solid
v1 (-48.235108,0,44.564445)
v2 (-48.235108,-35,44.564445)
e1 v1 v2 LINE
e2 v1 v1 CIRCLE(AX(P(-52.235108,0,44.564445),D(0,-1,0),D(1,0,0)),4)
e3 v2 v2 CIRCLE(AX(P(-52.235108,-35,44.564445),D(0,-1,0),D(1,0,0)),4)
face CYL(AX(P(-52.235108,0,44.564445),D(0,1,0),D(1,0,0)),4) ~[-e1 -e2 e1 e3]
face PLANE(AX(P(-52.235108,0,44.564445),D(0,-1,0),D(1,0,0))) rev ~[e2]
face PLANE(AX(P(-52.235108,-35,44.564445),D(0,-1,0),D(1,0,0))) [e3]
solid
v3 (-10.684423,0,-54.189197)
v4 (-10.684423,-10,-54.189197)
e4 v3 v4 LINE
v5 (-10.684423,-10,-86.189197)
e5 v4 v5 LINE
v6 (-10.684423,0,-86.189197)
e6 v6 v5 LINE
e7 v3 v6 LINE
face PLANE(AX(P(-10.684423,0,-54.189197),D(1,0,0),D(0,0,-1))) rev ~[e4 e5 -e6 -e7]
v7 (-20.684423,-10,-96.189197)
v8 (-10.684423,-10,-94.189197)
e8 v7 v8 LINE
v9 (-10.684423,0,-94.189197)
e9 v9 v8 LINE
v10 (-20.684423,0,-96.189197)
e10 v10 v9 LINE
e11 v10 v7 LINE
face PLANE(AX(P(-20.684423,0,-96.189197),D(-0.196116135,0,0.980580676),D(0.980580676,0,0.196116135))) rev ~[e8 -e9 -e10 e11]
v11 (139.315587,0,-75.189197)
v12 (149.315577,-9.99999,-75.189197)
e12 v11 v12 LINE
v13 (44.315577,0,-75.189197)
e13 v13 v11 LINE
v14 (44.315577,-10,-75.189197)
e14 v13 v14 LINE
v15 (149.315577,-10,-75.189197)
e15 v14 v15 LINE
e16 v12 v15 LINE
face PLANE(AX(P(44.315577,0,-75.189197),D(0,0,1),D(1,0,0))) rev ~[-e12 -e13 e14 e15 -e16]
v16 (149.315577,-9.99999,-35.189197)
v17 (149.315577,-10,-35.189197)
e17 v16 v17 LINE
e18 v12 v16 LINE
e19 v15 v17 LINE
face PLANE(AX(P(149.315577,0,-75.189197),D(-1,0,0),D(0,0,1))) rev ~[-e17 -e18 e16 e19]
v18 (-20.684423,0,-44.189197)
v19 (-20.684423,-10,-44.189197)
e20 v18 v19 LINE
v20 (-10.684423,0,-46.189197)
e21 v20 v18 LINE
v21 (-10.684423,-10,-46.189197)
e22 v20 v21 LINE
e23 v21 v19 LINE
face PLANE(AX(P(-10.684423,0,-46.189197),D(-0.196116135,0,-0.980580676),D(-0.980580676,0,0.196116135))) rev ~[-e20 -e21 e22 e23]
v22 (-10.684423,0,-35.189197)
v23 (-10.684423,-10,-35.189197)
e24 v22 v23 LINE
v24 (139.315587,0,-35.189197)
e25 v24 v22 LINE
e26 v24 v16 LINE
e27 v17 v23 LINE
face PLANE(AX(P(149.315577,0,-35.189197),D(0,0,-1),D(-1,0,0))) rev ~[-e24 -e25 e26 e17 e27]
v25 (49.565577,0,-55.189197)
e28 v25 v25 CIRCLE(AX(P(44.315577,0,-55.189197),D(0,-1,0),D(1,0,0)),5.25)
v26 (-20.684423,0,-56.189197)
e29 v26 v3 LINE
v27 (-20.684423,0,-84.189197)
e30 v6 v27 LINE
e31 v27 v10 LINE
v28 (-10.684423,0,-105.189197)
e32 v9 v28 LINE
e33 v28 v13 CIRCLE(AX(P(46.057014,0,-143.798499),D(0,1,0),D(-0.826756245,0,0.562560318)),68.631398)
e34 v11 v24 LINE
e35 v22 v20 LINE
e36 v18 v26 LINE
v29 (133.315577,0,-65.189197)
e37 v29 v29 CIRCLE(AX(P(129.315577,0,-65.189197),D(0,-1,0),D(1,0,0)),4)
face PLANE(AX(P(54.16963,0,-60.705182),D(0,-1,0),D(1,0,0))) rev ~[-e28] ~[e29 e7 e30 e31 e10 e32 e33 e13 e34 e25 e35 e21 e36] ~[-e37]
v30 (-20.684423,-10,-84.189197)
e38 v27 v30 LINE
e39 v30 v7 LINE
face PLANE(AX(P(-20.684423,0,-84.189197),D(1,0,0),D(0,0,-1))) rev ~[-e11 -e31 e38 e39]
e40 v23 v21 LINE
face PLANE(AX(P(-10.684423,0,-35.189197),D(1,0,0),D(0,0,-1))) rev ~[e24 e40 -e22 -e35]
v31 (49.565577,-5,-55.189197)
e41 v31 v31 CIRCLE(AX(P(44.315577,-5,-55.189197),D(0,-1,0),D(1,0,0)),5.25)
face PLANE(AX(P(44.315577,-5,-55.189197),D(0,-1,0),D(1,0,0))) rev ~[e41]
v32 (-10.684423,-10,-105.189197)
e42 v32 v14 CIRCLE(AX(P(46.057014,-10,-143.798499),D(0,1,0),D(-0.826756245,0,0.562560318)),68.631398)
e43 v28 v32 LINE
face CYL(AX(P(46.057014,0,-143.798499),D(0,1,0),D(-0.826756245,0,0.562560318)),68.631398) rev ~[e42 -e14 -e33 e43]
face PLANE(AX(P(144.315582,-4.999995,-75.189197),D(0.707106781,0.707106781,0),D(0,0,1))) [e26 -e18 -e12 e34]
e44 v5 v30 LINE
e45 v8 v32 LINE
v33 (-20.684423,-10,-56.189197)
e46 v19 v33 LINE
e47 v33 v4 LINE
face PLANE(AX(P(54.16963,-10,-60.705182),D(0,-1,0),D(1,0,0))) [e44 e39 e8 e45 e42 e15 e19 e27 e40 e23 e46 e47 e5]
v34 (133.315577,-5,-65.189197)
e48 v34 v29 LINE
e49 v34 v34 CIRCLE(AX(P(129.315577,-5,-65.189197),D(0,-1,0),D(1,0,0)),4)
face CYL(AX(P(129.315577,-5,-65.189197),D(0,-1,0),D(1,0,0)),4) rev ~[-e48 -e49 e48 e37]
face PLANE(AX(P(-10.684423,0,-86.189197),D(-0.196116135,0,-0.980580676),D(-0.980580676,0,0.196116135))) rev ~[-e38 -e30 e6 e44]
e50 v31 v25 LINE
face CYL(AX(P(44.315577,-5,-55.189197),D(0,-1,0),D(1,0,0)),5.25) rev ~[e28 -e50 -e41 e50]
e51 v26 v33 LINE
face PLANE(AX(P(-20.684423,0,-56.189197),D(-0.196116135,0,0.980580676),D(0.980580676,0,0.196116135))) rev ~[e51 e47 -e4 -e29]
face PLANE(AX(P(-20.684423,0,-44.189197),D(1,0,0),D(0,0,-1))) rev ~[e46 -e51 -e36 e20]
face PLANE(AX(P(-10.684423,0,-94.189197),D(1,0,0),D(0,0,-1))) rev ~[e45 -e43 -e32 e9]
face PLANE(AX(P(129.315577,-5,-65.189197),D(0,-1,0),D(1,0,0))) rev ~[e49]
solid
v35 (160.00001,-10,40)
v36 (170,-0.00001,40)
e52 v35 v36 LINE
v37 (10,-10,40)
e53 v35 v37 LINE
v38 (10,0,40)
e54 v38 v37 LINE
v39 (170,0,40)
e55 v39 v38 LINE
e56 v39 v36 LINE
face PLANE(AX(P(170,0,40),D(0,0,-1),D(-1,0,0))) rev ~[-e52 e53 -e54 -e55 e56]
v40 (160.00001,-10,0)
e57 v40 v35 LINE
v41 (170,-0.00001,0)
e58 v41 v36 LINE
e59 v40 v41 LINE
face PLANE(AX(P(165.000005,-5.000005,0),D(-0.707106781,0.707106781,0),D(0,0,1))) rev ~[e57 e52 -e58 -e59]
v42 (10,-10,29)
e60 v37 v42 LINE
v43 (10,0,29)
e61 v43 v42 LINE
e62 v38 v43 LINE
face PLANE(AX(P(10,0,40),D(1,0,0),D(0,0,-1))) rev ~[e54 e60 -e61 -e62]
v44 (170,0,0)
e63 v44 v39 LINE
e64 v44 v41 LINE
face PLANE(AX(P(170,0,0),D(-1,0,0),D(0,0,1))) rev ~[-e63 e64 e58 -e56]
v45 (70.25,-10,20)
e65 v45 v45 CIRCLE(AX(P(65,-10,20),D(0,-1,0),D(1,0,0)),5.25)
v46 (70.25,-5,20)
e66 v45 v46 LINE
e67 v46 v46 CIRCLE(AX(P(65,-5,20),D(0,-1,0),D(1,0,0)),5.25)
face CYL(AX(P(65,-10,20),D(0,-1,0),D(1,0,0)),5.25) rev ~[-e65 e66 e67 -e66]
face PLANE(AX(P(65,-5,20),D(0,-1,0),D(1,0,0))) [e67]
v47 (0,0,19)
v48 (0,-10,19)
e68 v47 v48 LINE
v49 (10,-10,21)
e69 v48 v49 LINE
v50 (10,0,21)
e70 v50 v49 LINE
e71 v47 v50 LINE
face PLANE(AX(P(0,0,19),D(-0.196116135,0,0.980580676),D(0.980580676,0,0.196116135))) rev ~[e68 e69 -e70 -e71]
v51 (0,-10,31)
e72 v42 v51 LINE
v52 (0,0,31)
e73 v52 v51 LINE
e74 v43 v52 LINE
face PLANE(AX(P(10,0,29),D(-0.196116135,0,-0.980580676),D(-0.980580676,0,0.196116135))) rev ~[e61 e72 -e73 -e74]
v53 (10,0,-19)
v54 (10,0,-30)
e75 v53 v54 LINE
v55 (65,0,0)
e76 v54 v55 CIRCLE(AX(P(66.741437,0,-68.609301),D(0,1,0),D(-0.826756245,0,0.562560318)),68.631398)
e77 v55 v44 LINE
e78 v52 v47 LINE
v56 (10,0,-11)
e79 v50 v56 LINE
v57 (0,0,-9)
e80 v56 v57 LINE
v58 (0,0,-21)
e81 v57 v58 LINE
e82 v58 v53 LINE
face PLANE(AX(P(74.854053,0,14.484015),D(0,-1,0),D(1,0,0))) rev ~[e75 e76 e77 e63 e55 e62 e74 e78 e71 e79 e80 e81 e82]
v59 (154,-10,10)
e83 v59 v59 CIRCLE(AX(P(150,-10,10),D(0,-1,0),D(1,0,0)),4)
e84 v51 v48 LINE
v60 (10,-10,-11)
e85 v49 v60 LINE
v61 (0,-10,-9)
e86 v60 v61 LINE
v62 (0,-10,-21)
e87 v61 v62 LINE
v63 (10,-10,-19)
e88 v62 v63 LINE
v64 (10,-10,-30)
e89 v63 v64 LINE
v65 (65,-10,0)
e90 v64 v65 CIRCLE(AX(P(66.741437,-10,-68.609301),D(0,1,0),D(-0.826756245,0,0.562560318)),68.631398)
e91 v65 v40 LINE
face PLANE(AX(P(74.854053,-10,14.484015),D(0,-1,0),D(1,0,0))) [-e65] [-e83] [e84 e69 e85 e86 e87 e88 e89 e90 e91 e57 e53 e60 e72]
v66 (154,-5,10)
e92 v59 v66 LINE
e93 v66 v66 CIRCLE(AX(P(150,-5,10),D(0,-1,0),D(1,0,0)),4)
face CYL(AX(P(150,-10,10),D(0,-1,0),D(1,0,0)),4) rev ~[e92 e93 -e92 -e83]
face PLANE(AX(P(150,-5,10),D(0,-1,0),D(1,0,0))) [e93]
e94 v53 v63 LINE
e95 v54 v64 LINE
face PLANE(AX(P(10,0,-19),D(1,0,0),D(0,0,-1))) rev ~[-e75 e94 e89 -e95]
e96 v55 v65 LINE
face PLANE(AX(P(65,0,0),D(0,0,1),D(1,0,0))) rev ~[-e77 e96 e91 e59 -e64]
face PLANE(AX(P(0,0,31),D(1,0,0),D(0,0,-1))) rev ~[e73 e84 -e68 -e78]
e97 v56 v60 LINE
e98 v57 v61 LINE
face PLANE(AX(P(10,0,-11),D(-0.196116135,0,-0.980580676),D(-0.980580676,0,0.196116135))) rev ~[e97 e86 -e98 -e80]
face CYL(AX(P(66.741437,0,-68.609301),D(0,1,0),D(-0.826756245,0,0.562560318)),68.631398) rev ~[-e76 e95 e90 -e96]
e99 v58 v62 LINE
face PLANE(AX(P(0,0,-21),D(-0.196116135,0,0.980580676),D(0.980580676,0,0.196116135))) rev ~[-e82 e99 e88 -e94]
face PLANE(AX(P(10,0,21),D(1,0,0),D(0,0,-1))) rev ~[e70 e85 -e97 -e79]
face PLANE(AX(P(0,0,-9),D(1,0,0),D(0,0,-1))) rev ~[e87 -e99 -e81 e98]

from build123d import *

# Parameters (mm, degrees)
F1_DEPTH  = 10
F2_R      = 5.25
F2_R_2    = 4
F3_DEPTH  = 5
F4_SIZE   = 9.99999
F6_DEPTH  = 10
F8_START  = -5
F7_R      = 5.25
F7_R_2    = 4
F8_DEPTH  = 5
F9_SIZE   = 9.99999
F10_R     = 4
F11_DEPTH = 35


# Not quite as in the source:
# - a fillet or chamfer is up to 0.001 mm smaller than in the source, because OpenCascade refuses the exact size


with BuildPart() as f1:
    # F0 (on Front) → F1 (new body)
    with BuildSketch(Plane.XZ):
        with BuildLine():
            ThreePointArc((10, -30), (33.8771457744, -8.3581005863), (65, 0))
            Line((65, 0), (170, 0))
            Line((170, 0), (170, 40))
            Line((170, 40), (10, 40))
            Line((10, 40), (10, 29))
            Line((10, 29), (0, 31))
            Line((0, 31), (0, 19))
            Line((0, 19), (10, 21))
            Line((10, 21), (10, -11))
            Line((10, -11), (0, -9))
            Line((0, -9), (0, -21))
            Line((0, -21), (10, -19))
            Line((10, -19), (10, -30))
        make_face()
    extrude(amount=F1_DEPTH)

    # F2 (on face) → F3 (cut)
    with BuildSketch(Plane.XZ.offset(10)):
        with Locations((65, 20)):
            Circle(F2_R)
        with Locations((150, 10)):
            Circle(F2_R_2)
    extrude(amount=-F3_DEPTH, mode=Mode.SUBTRACT)

    # F4 (size 10 in the source; OpenCascade refuses exactly that, so slightly less here)
    f4_edges = [f1.edges().sort_by_distance(p)[0] for p in [
        (170, -10, 20),
    ]]
    chamfer(f4_edges, length=F4_SIZE)


with BuildPart() as f6:
    # F5 (on Front) → F6 (new body)
    with BuildSketch(Plane.XZ):
        with BuildLine():
            ThreePointArc((-10.6844227825, -105.189197356), (13.1927229919, -83.5472979423), (44.3155772175, -75.189197356))
            Line((44.3155772175, -75.189197356), (149.3155772175, -75.189197356))
            Line((149.3155772175, -75.189197356), (149.3155772175, -35.189197356))
            Line((149.3155772175, -35.189197356), (-10.6844227825, -35.189197356))
            Line((-10.6844227825, -35.189197356), (-10.6844227825, -46.189197356))
            Line((-10.6844227825, -46.189197356), (-20.6844227825, -44.189197356))
            Line((-20.6844227825, -44.189197356), (-20.6844227825, -56.189197356))
            Line((-20.6844227825, -56.189197356), (-10.6844227825, -54.189197356))
            Line((-10.6844227825, -54.189197356), (-10.6844227825, -86.189197356))
            Line((-10.6844227825, -86.189197356), (-20.6844227825, -84.189197356))
            Line((-20.6844227825, -84.189197356), (-20.6844227825, -96.189197356))
            Line((-20.6844227825, -96.189197356), (-10.6844227825, -94.189197356))
            Line((-10.6844227825, -94.189197356), (-10.6844227825, -105.189197356))
        make_face()
    extrude(amount=F6_DEPTH)

    # F7 (on face) → F8 (cut)
    with BuildSketch(Plane.XZ.offset(10).offset(F8_START)):
        with Locations((44.3155772175, -55.189197356)):
            Circle(F7_R)
        with Locations((129.3155772175, -65.189197356)):
            Circle(F7_R_2)
    extrude(amount=-F8_DEPTH, mode=Mode.SUBTRACT)

    # F9 (size 10 in the source; OpenCascade refuses exactly that, so slightly less here)
    f9_edges = [f6.edges().sort_by_distance(p)[0] for p in [
        (149.315577, 0, -55.189197),
    ]]
    chamfer(f9_edges, length=F9_SIZE)


with BuildPart() as f11:
    # F10 (on Front) → F11 (new body)
    with BuildSketch(Plane.XZ):
        with Locations((-52.2351078689, 44.5644445717)):
            Circle(F10_R)
    extrude(amount=F11_DEPTH)


solid = Compound([f1.part, f6.part, f11.part])
